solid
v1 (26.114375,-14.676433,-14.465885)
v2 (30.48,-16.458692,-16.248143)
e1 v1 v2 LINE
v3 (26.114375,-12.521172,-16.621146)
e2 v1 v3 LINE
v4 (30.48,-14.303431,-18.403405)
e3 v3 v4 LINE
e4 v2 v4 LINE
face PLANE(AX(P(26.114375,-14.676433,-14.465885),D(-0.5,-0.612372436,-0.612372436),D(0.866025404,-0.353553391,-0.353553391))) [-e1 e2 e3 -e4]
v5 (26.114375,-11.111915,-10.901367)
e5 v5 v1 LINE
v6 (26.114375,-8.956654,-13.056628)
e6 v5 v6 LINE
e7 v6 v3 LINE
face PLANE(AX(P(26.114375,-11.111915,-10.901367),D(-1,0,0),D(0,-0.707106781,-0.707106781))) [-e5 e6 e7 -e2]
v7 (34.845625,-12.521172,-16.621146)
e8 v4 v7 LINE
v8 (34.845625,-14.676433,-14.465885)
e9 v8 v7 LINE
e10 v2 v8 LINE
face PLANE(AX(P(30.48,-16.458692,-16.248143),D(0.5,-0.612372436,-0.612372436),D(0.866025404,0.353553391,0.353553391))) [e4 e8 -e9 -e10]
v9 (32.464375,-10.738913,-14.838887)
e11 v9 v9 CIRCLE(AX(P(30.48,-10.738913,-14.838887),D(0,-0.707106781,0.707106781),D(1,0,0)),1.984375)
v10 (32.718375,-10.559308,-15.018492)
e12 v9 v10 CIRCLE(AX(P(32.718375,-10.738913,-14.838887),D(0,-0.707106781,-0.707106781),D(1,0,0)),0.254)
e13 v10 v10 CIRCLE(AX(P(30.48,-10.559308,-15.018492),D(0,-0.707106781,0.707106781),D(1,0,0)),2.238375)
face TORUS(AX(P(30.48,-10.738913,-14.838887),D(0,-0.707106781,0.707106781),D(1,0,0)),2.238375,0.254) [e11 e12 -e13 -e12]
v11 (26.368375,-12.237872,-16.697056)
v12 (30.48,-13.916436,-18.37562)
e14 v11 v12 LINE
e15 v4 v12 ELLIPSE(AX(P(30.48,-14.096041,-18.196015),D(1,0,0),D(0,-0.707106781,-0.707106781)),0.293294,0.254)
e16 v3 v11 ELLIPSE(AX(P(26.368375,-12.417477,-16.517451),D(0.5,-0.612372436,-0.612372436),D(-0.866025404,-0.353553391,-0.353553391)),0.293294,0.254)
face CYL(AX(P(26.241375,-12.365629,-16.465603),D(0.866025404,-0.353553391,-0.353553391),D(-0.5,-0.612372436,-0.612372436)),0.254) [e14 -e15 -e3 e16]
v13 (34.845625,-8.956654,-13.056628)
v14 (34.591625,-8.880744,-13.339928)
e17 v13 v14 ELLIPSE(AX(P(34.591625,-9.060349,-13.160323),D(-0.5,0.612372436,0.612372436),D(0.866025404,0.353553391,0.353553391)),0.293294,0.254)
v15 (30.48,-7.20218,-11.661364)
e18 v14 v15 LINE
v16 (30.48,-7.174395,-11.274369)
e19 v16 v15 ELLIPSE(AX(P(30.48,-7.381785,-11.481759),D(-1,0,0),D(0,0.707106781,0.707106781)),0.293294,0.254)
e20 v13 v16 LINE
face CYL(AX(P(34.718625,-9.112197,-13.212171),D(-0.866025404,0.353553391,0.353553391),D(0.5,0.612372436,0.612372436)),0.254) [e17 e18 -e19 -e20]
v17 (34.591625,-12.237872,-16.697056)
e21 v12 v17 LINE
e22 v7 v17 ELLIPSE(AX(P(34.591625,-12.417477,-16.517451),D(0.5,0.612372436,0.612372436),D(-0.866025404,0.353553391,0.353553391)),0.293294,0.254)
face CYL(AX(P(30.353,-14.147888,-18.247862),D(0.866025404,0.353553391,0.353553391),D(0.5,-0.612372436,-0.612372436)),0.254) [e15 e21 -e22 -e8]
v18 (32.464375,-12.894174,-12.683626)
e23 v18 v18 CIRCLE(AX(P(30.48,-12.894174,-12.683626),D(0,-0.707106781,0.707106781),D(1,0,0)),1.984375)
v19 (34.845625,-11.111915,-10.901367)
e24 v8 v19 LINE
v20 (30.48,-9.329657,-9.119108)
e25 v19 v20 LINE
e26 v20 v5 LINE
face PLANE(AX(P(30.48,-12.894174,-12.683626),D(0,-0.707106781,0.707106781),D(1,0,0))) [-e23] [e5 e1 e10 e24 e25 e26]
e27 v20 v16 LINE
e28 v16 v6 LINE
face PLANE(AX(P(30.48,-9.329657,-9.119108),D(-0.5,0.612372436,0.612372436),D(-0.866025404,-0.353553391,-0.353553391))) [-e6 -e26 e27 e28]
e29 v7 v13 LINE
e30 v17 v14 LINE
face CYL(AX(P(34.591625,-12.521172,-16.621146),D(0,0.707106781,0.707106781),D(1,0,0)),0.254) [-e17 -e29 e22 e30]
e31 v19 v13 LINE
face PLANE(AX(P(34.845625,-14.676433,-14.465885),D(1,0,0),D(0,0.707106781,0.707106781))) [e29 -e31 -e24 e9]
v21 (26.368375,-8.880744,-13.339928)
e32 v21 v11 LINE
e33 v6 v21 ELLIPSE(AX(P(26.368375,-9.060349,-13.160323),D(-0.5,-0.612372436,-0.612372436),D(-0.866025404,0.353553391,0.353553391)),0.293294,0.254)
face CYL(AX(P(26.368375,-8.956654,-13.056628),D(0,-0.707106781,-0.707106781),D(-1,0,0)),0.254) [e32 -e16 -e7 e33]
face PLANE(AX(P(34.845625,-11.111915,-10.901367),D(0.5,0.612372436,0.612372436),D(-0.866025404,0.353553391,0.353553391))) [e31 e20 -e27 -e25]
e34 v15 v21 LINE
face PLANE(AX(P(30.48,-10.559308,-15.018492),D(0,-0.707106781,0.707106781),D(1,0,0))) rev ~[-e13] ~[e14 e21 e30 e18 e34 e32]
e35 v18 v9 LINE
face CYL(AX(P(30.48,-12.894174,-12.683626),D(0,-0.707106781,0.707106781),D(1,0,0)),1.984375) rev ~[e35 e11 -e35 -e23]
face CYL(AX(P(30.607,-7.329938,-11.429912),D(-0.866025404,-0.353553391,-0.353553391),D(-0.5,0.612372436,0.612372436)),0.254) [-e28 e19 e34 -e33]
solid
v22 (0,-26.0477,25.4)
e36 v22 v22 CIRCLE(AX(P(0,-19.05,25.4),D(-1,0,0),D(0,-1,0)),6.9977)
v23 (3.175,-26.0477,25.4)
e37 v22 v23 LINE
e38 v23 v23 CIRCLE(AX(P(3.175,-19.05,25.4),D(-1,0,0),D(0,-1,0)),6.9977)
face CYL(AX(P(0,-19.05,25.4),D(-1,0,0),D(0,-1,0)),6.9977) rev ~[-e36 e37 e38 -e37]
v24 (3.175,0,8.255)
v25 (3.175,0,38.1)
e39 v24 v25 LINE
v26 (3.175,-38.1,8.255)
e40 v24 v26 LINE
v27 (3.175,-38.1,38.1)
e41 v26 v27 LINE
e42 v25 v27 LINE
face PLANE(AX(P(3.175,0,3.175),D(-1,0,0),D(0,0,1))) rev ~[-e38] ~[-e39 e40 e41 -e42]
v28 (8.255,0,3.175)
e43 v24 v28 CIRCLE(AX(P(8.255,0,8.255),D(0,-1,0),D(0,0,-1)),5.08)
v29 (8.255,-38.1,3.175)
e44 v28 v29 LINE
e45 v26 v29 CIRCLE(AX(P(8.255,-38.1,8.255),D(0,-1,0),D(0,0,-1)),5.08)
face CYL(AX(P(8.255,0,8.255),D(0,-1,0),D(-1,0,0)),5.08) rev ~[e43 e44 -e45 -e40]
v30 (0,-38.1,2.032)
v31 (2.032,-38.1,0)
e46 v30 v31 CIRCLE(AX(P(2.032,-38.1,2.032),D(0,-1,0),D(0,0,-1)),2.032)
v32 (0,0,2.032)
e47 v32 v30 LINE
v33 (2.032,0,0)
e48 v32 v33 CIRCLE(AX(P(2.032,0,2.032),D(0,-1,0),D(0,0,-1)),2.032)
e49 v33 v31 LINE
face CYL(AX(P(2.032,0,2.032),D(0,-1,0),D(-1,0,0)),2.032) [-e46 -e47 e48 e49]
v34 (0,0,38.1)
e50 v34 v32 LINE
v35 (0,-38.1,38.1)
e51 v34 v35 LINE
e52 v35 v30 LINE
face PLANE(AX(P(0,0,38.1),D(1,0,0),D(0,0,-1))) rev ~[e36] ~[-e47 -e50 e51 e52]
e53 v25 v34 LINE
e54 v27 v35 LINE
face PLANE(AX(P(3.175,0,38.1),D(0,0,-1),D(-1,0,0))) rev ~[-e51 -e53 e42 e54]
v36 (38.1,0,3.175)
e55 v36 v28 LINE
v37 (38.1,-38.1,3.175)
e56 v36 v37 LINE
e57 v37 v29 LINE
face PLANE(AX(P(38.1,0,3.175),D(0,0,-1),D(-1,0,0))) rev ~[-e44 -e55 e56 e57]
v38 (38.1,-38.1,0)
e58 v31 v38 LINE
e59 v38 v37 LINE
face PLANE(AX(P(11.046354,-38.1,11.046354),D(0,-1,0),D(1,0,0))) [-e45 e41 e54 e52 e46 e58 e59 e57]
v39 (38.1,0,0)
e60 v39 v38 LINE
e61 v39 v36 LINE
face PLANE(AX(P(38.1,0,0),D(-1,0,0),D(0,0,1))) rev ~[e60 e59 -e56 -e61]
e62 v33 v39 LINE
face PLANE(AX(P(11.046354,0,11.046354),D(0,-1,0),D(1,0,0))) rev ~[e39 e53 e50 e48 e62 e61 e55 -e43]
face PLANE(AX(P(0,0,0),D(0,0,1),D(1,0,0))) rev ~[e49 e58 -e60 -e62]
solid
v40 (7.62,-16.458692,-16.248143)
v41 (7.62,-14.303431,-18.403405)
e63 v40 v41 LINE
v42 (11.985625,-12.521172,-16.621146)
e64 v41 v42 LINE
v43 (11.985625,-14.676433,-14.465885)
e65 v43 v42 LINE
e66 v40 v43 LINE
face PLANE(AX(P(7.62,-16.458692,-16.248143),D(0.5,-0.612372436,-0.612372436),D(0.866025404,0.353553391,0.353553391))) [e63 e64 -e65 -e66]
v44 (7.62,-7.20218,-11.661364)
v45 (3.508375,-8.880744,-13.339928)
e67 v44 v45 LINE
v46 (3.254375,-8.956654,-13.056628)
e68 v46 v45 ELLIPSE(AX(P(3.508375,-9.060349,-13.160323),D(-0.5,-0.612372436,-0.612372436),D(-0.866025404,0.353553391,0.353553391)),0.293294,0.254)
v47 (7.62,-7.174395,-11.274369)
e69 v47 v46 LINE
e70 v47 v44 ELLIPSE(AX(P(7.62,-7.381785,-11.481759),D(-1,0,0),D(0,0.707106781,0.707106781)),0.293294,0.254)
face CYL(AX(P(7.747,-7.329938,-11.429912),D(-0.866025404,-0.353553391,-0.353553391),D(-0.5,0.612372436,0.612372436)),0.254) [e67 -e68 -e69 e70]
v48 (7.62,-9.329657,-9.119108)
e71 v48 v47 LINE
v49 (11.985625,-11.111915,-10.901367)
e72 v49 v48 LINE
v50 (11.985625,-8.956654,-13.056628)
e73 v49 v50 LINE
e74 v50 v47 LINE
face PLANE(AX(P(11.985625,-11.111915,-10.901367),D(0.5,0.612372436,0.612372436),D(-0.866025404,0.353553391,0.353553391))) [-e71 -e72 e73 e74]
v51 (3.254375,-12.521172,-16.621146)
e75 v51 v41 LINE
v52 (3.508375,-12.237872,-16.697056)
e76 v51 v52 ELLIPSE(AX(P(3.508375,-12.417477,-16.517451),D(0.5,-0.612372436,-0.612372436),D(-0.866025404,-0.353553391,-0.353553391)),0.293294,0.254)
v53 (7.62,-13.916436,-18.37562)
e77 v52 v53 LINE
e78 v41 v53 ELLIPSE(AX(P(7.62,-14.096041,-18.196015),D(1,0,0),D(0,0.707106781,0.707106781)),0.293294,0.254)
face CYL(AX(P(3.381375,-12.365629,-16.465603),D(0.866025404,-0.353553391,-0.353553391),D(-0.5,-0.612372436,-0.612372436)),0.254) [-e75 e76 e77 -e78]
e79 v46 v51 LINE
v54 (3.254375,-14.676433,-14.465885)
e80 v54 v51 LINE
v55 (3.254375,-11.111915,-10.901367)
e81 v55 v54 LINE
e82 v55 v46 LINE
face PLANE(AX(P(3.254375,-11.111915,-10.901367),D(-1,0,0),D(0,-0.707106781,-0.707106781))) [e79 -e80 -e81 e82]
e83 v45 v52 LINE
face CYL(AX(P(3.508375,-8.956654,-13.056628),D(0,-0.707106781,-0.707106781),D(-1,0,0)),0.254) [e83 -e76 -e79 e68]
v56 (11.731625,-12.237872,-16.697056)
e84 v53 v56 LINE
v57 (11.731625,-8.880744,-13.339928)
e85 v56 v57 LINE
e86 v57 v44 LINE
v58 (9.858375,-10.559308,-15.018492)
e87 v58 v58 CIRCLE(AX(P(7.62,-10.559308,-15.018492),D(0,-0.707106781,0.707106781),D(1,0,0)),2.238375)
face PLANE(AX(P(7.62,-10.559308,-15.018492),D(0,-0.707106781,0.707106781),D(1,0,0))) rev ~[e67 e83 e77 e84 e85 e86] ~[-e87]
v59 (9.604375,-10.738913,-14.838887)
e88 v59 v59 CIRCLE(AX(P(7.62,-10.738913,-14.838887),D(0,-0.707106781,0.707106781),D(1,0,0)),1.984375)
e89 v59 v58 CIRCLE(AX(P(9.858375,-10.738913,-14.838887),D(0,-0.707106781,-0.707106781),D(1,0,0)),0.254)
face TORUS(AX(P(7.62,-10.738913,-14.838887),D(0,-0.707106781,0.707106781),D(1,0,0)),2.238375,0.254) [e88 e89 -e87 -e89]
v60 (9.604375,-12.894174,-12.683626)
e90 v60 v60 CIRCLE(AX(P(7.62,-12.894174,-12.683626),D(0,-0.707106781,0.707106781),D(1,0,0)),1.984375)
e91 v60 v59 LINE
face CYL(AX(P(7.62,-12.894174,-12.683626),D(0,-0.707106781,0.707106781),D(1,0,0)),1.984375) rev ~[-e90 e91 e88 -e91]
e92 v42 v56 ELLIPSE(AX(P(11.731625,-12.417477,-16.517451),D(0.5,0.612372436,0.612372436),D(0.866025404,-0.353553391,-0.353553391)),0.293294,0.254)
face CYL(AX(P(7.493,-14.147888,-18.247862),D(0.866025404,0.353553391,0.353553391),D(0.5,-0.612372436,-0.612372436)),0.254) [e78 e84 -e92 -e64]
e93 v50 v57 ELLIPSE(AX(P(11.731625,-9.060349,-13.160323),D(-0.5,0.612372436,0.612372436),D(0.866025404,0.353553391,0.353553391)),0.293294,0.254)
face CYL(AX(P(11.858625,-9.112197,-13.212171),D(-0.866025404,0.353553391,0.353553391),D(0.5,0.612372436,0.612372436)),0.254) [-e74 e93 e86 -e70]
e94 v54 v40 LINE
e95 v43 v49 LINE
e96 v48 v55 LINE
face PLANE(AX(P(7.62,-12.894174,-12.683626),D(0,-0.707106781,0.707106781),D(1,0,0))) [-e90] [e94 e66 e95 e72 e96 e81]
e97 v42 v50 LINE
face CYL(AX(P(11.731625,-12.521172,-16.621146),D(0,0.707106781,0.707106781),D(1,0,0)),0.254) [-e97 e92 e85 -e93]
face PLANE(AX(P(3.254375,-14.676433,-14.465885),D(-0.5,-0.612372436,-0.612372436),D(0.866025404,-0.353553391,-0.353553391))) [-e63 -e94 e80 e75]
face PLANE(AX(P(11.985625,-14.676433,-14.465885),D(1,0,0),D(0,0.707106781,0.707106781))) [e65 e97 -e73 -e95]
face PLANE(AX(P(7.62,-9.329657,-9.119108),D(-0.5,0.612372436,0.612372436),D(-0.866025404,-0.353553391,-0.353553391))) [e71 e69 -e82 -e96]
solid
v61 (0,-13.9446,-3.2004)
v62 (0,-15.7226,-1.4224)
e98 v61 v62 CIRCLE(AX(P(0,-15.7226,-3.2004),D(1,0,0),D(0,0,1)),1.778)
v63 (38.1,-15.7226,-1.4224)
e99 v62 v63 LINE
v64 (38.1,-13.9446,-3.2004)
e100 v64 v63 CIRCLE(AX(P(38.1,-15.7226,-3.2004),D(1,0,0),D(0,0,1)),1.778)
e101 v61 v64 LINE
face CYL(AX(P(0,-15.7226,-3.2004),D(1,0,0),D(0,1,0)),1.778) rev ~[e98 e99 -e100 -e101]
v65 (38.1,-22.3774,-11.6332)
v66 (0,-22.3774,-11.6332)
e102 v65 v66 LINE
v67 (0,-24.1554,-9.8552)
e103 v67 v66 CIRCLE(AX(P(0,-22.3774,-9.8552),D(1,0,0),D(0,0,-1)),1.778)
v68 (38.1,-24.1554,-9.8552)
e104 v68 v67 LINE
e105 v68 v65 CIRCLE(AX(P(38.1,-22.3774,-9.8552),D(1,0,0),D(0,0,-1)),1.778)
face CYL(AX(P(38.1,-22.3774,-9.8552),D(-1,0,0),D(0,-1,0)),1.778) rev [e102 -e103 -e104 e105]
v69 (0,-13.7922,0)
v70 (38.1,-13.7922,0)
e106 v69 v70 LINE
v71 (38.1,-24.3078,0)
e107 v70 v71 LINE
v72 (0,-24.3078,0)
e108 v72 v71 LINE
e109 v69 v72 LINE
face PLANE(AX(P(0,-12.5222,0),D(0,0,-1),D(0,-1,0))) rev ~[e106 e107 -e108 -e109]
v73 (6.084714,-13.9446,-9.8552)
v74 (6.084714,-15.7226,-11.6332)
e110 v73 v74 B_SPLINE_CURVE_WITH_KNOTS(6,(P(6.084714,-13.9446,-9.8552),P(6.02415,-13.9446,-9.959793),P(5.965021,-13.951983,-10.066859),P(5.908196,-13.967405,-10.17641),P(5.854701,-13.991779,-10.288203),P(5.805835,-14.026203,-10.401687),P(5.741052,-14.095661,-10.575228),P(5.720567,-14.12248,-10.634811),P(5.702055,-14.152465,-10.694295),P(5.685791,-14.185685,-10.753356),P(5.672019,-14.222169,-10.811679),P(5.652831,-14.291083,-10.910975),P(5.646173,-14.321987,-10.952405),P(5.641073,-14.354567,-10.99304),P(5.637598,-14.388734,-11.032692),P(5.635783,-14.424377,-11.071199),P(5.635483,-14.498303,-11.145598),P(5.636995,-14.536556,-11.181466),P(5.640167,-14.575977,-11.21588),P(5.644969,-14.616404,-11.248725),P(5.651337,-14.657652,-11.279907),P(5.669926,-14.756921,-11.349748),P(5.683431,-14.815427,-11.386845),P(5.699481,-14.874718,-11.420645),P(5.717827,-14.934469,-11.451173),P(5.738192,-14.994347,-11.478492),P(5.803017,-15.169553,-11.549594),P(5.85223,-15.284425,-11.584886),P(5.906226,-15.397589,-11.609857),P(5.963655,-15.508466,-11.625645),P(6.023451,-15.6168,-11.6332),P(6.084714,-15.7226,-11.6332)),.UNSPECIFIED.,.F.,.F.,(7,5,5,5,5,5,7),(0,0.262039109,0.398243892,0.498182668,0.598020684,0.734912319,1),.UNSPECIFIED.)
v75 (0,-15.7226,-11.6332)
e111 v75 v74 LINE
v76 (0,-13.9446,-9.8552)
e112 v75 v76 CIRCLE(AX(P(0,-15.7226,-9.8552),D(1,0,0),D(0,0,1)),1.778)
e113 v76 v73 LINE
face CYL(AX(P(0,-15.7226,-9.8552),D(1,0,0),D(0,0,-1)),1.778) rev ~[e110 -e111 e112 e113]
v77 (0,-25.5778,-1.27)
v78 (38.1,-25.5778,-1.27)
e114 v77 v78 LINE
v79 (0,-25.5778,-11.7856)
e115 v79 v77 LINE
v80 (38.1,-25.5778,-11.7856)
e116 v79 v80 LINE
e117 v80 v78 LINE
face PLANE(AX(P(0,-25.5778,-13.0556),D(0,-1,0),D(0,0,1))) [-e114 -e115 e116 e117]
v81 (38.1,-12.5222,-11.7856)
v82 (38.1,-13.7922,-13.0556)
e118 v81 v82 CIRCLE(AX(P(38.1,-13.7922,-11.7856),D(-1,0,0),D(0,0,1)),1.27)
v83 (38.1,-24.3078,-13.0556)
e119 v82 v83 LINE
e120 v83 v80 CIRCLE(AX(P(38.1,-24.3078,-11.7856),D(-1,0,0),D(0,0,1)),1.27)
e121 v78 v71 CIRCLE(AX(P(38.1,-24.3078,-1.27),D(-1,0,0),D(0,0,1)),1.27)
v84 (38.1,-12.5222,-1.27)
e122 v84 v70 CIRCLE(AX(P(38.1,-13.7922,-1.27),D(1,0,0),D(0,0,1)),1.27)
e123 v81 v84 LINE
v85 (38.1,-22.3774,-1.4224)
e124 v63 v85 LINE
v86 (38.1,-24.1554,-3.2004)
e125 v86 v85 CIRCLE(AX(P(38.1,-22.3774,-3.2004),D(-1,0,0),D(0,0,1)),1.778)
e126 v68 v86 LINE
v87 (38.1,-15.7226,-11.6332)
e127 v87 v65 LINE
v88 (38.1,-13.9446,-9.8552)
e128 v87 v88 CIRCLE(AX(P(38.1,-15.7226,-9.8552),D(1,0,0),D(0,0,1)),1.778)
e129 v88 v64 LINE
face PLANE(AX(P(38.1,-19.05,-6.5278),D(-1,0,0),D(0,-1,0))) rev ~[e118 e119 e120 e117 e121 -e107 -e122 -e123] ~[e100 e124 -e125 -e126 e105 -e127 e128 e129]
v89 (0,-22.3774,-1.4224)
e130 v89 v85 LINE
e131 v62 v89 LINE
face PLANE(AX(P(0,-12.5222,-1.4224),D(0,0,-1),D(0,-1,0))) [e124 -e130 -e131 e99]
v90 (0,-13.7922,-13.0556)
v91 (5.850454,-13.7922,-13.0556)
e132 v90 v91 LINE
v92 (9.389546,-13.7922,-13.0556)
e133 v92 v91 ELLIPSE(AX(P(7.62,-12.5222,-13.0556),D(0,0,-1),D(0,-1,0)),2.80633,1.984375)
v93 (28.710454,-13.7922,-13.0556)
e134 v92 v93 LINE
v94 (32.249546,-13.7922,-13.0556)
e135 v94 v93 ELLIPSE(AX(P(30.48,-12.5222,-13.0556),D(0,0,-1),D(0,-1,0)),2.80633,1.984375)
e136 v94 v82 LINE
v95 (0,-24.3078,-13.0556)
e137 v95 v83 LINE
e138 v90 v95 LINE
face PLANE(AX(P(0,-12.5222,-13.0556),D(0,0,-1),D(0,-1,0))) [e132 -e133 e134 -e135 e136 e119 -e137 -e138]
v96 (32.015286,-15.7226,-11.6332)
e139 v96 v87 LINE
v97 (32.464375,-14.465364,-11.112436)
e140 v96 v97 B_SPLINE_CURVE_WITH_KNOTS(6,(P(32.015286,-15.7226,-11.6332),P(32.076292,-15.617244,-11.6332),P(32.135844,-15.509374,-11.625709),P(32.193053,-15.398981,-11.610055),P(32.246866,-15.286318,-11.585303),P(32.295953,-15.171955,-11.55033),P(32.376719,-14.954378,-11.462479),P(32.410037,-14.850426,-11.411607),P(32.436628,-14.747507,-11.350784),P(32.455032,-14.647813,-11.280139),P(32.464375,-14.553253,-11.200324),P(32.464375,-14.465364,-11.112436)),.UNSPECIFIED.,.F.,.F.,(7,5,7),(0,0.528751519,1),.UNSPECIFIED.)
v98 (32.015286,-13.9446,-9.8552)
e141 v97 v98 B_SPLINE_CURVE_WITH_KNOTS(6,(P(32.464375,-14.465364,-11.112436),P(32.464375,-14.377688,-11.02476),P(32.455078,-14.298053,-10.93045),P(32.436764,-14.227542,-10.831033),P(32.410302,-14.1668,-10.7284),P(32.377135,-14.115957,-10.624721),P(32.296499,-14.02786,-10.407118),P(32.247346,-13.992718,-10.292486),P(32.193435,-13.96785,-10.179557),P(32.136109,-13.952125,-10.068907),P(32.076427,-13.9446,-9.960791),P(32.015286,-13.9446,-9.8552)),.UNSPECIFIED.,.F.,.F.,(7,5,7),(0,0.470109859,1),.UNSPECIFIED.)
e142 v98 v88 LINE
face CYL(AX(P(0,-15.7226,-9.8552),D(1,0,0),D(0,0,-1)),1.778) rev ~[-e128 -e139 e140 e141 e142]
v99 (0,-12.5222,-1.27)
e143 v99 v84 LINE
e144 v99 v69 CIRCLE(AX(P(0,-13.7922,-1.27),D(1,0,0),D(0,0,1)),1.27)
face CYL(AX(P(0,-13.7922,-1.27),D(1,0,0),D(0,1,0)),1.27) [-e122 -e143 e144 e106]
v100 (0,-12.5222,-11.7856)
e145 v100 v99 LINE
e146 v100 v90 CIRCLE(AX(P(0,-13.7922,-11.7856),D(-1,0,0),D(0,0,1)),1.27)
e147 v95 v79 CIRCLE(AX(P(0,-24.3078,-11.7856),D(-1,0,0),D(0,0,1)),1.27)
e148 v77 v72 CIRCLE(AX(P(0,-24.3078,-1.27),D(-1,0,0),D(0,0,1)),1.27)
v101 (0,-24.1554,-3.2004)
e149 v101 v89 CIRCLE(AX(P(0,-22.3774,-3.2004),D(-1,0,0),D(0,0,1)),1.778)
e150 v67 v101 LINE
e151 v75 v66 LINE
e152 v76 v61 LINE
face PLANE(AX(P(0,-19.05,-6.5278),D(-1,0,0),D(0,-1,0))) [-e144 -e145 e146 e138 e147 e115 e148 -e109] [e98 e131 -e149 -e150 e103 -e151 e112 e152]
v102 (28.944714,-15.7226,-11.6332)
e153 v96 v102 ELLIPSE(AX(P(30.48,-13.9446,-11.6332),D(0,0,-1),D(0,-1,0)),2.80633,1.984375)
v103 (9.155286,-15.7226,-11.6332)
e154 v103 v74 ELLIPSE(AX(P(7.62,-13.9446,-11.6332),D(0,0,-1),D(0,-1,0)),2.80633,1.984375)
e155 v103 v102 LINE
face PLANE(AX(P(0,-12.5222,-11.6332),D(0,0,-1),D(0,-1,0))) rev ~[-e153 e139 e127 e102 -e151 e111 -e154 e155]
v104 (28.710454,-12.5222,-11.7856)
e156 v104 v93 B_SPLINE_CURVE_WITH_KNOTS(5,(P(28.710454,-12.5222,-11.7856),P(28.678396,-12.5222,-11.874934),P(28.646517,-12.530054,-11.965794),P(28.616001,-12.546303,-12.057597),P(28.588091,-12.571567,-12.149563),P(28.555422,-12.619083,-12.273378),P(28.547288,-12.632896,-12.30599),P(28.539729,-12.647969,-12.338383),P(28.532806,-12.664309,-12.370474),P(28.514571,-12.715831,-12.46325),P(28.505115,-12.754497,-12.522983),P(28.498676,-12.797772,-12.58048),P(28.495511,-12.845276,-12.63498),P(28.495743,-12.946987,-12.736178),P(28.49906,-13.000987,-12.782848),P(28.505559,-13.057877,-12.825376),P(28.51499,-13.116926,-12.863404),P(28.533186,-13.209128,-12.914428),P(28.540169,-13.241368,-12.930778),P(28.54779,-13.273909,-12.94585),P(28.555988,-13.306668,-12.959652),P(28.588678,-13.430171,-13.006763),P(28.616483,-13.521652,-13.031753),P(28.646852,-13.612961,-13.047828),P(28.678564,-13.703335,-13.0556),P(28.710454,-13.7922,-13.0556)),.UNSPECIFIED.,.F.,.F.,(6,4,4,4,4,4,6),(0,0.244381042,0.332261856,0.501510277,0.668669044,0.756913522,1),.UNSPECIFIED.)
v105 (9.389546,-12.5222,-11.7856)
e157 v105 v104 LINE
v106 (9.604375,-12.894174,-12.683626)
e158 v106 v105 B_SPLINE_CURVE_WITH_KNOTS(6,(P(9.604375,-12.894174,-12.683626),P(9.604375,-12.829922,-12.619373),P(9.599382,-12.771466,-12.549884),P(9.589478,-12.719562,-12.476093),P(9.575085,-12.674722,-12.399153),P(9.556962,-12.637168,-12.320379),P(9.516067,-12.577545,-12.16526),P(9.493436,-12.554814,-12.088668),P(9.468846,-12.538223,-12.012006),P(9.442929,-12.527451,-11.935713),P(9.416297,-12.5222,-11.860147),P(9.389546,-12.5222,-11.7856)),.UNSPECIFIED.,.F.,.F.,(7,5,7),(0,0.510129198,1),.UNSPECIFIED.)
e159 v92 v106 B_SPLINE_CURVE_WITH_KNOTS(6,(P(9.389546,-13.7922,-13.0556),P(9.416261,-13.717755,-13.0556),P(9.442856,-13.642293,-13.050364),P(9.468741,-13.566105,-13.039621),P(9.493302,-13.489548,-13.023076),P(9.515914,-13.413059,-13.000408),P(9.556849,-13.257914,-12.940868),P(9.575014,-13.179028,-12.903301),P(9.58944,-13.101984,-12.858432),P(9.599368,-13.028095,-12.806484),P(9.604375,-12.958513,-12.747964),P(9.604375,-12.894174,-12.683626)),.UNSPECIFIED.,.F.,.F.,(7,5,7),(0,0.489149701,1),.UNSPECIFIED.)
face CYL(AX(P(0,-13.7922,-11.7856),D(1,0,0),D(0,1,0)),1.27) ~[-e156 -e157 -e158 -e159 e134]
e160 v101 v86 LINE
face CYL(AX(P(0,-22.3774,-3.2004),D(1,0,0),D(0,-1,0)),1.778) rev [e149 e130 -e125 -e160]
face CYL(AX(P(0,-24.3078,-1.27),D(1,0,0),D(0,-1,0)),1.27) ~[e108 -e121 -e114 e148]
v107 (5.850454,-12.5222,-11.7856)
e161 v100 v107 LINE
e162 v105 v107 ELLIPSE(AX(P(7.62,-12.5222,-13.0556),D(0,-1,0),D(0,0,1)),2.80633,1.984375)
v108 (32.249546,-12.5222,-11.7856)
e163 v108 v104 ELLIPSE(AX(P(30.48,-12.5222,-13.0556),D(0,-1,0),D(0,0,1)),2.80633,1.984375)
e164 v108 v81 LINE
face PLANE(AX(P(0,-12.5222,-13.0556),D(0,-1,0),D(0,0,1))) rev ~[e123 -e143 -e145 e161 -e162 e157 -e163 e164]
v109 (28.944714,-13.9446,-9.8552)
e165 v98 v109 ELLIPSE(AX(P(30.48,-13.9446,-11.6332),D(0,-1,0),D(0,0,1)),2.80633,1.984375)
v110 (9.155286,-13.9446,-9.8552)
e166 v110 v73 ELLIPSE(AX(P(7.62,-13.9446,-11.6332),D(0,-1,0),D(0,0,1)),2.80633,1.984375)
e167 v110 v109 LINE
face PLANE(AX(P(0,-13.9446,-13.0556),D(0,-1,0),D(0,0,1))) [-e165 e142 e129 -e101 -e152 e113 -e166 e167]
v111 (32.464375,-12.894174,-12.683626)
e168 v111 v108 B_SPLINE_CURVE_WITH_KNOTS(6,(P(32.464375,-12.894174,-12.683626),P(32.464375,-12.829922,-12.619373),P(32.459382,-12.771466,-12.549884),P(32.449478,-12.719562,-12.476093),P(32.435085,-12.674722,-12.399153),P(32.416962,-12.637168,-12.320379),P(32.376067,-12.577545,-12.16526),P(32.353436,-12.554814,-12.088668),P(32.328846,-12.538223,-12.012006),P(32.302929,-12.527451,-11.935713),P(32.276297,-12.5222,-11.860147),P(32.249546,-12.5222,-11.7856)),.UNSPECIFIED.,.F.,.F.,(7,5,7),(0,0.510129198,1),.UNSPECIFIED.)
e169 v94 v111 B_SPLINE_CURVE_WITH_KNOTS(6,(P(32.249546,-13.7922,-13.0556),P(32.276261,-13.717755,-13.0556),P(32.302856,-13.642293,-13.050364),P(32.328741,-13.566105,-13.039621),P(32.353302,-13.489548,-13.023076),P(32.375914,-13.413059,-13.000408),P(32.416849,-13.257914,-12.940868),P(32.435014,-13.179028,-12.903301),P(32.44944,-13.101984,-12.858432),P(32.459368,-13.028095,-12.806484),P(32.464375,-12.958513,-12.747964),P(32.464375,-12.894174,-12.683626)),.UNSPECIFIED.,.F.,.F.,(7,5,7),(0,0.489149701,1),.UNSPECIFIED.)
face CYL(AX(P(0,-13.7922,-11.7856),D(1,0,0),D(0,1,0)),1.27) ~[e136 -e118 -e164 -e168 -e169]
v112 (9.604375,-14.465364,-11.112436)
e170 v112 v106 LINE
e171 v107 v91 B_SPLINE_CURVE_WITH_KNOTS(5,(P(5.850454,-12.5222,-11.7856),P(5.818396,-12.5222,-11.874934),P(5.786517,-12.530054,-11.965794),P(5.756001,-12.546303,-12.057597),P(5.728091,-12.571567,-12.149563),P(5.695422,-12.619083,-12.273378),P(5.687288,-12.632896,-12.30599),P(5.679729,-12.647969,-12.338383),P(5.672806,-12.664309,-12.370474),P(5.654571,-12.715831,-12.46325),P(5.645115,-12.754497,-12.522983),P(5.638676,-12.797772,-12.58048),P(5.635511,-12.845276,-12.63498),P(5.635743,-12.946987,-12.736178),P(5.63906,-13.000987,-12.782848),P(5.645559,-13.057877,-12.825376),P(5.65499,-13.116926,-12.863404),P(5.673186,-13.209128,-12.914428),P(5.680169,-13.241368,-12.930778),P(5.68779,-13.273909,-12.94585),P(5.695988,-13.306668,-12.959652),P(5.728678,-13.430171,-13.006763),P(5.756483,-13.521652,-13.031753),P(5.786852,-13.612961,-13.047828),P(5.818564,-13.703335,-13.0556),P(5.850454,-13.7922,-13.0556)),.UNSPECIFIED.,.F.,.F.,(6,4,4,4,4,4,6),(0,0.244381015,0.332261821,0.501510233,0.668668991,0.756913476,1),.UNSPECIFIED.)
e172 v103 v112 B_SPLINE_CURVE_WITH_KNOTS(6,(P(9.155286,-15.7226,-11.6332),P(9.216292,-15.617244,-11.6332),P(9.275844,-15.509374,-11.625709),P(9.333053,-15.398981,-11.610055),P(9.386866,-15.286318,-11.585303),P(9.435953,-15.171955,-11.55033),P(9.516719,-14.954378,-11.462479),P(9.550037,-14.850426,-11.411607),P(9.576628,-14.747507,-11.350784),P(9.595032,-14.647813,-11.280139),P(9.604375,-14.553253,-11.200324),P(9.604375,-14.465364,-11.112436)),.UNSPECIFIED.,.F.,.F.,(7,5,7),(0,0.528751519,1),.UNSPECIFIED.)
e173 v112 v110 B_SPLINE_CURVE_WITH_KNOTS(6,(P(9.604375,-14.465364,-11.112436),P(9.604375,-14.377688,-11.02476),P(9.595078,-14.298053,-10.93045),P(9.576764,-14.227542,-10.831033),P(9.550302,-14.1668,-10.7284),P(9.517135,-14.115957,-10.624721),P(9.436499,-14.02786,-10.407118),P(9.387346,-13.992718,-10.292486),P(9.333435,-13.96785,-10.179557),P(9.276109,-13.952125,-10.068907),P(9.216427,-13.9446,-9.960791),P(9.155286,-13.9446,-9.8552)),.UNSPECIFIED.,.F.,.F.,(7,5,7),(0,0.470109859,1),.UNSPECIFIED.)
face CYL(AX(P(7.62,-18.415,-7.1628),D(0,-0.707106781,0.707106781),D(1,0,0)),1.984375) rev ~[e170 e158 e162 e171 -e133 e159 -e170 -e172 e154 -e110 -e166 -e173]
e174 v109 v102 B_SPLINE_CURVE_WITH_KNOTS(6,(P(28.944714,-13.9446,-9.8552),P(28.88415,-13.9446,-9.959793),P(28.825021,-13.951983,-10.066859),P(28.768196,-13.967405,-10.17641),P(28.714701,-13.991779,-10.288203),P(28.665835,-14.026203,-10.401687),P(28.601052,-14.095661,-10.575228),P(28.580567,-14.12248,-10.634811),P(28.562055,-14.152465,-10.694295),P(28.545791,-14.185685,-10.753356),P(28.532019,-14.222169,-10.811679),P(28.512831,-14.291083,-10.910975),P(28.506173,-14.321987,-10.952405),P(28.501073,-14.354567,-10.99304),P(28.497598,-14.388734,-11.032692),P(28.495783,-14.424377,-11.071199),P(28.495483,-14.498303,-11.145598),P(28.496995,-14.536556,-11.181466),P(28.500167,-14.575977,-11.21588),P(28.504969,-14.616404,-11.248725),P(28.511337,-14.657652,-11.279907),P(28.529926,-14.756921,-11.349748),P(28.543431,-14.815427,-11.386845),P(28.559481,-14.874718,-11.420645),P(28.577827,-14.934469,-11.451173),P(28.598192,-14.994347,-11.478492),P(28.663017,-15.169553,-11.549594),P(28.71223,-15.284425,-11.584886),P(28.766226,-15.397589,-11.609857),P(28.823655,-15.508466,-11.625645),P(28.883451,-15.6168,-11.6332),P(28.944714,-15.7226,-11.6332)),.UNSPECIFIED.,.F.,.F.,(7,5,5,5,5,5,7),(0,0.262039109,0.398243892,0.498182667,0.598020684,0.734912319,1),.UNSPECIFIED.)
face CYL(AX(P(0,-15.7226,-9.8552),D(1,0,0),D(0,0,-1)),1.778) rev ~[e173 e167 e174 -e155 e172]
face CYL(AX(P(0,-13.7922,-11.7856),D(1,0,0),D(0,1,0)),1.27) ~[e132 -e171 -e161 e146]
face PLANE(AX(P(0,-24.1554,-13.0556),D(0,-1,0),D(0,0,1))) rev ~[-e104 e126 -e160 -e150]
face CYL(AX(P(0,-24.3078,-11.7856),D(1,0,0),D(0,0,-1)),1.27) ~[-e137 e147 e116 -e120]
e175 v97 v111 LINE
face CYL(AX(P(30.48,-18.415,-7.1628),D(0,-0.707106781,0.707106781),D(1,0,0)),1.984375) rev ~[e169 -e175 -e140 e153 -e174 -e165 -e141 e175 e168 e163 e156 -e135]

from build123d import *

# Parameters (mm, degrees)
F1_DEPTH  = 38.1
F2_R      = 6.9977
F3_DEPTH  = 38.101
F4_R      = 2.032
F5_R      = 5.08
F6_W      = 13.0556
F6_H      = 13.0556
F7_DEPTH  = 38.1
F8_T      = -1.4224
F9_R      = 1.27
F10_R     = 1.778
F12_R     = 1.984375
F13_DEPTH = 17.1892102157
F16_R     = 1.984375
F17_DEPTH = 3.302
F18_R     = 0.254
F18_2_R   = 0.254


with BuildPart() as f1:
    # F0 (on Front) → F1 (new body)
    with BuildSketch(Plane.XZ):
        Polygon((3.175, 38.1), (0, 38.1), (0, 0), (38.1, 0), (38.1, 3.175), (3.175, 3.175), align=None)
    extrude(amount=F1_DEPTH)

    # F2 (on face) → F3 (cut, through all)
    with BuildSketch(Plane(origin=(0, 0, 0), x_dir=(0, -1, 0), z_dir=(-1, 0, 0))):
        with Locations((19.05, 25.4)):
            Circle(F2_R)
    extrude(amount=-F3_DEPTH, mode=Mode.SUBTRACT)

    # F4
    f4_edges = [f1.edges().sort_by_distance(p)[0] for p in [
        (0, -19.05, 0),
    ]]
    fillet(f4_edges, radius=F4_R)

    # F5
    f5_edges = [f1.edges().sort_by_distance(p)[0] for p in [
        (3.175, -19.05, 3.175),
    ]]
    fillet(f5_edges, radius=F5_R)


with BuildPart() as f7:
    # F6 (on face) → F7 (new body, through all)
    with BuildSketch(Plane(origin=(0, 0, 0), x_dir=(0, -1, 0), z_dir=(-1, 0, 0))):
        with Locations((19.05, -6.5278)):
            Rectangle(F6_W, F6_H)
    extrude(amount=-F7_DEPTH)

    # F8
    f8_openings = [f7.faces().sort_by_distance(p)[0] for p in [
        (38.1, -19.05, -6.5278),
        (0, -19.05, -6.5278),
    ]]
    offset(amount=F8_T, openings=f8_openings)

    # F9
    f9_edges = [f7.edges().sort_by_distance(p)[0] for p in [
        (19.05, -25.5778, -13.0556),
        (19.05, -25.5778, 0),
        (19.05, -12.5222, -13.0556),
        (19.05, -12.5222, 0),
    ]]
    fillet(f9_edges, radius=F9_R)

    # F10
    f10_edges = [f7.edges().sort_by_distance(p)[0] for p in [
        (19.05, -24.1554, -11.6332),
        (19.05, -24.1554, -1.4224),
        (19.05, -13.9446, -1.4224),
        (19.05, -13.9446, -11.6332),
    ]]
    fillet(f10_edges, radius=F10_R)

    # F12 (on face) → F13 (cut, through all)
    with BuildSketch(Plane(origin=(0, -5.6261, 5.6261), x_dir=(1, 0, 0), z_dir=(0, -0.7071067812, 0.7071067812))):
        with Locations((30.48, -18.0862358278)):
            Circle(F12_R)
        with Locations((7.62, -18.0862358278)):
            Circle(F12_R)
    extrude(amount=-F13_DEPTH, mode=Mode.SUBTRACT)


with BuildPart() as f17:
    # F16 (on face) → F17 (new body)
    with BuildSketch(Plane(origin=(0, -0.1052743879, 0.1052743879), x_dir=(1, 0, 0), z_dir=(0, -0.7071067812, 0.7071067812))):
        Polygon((11.985625, -20.6067305968), (11.985625, -15.5657410589), (7.62, -13.04524629), (3.254375, -15.5657410589), (3.254375, -20.6067305968), (7.62, -23.1272253657), align=None)
        with Locations((7.62, -18.0862358278)):
            Circle(F16_R, mode=Mode.SUBTRACT)
    extrude(amount=-F17_DEPTH)

    # F18
    f18_edges = [f17.edges().sort_by_distance(p)[0] for p in [
        (9.802812, -13.232696, -17.691881),
        (11.985625, -10.559308, -15.018492),
        (9.802812, -7.885919, -12.345104),
        (5.437187, -7.885919, -12.345104),
        (3.254375, -10.559308, -15.018492),
        (5.437188, -13.232696, -17.691881),
        (5.635625, -10.559308, -15.018492),
    ]]
    fillet(f18_edges, radius=F18_R)


with BuildPart() as f17b:
    # F16 (on face) → F17, piece 2 (new body)
    with BuildSketch(Plane(origin=(0, -0.1052743879, 0.1052743879), x_dir=(1, 0, 0), z_dir=(0, -0.7071067812, 0.7071067812))):
        Polygon((34.845625, -15.5657410589), (30.48, -13.04524629), (26.114375, -15.5657410589), (26.114375, -20.6067305968), (30.48, -23.1272253657), (34.845625, -20.6067305968), align=None)
        with Locations((30.48, -18.0862358278)):
            Circle(F16_R, mode=Mode.SUBTRACT)
    extrude(amount=-F17_DEPTH)

    # F18#2
    f18_2_edges = [f17b.edges().sort_by_distance(p)[0] for p in [
        (34.845625, -10.559308, -15.018492),
        (32.662813, -7.885919, -12.345104),
        (28.297187, -7.885919, -12.345104),
        (26.114375, -10.559308, -15.018492),
        (28.297187, -13.232696, -17.691881),
        (32.662813, -13.232696, -17.691881),
        (28.495625, -10.559308, -15.018492),
    ]]
    fillet(f18_2_edges, radius=F18_2_R)


solid = Compound([f1.part, f7.part, f17.part, f17b.part])
